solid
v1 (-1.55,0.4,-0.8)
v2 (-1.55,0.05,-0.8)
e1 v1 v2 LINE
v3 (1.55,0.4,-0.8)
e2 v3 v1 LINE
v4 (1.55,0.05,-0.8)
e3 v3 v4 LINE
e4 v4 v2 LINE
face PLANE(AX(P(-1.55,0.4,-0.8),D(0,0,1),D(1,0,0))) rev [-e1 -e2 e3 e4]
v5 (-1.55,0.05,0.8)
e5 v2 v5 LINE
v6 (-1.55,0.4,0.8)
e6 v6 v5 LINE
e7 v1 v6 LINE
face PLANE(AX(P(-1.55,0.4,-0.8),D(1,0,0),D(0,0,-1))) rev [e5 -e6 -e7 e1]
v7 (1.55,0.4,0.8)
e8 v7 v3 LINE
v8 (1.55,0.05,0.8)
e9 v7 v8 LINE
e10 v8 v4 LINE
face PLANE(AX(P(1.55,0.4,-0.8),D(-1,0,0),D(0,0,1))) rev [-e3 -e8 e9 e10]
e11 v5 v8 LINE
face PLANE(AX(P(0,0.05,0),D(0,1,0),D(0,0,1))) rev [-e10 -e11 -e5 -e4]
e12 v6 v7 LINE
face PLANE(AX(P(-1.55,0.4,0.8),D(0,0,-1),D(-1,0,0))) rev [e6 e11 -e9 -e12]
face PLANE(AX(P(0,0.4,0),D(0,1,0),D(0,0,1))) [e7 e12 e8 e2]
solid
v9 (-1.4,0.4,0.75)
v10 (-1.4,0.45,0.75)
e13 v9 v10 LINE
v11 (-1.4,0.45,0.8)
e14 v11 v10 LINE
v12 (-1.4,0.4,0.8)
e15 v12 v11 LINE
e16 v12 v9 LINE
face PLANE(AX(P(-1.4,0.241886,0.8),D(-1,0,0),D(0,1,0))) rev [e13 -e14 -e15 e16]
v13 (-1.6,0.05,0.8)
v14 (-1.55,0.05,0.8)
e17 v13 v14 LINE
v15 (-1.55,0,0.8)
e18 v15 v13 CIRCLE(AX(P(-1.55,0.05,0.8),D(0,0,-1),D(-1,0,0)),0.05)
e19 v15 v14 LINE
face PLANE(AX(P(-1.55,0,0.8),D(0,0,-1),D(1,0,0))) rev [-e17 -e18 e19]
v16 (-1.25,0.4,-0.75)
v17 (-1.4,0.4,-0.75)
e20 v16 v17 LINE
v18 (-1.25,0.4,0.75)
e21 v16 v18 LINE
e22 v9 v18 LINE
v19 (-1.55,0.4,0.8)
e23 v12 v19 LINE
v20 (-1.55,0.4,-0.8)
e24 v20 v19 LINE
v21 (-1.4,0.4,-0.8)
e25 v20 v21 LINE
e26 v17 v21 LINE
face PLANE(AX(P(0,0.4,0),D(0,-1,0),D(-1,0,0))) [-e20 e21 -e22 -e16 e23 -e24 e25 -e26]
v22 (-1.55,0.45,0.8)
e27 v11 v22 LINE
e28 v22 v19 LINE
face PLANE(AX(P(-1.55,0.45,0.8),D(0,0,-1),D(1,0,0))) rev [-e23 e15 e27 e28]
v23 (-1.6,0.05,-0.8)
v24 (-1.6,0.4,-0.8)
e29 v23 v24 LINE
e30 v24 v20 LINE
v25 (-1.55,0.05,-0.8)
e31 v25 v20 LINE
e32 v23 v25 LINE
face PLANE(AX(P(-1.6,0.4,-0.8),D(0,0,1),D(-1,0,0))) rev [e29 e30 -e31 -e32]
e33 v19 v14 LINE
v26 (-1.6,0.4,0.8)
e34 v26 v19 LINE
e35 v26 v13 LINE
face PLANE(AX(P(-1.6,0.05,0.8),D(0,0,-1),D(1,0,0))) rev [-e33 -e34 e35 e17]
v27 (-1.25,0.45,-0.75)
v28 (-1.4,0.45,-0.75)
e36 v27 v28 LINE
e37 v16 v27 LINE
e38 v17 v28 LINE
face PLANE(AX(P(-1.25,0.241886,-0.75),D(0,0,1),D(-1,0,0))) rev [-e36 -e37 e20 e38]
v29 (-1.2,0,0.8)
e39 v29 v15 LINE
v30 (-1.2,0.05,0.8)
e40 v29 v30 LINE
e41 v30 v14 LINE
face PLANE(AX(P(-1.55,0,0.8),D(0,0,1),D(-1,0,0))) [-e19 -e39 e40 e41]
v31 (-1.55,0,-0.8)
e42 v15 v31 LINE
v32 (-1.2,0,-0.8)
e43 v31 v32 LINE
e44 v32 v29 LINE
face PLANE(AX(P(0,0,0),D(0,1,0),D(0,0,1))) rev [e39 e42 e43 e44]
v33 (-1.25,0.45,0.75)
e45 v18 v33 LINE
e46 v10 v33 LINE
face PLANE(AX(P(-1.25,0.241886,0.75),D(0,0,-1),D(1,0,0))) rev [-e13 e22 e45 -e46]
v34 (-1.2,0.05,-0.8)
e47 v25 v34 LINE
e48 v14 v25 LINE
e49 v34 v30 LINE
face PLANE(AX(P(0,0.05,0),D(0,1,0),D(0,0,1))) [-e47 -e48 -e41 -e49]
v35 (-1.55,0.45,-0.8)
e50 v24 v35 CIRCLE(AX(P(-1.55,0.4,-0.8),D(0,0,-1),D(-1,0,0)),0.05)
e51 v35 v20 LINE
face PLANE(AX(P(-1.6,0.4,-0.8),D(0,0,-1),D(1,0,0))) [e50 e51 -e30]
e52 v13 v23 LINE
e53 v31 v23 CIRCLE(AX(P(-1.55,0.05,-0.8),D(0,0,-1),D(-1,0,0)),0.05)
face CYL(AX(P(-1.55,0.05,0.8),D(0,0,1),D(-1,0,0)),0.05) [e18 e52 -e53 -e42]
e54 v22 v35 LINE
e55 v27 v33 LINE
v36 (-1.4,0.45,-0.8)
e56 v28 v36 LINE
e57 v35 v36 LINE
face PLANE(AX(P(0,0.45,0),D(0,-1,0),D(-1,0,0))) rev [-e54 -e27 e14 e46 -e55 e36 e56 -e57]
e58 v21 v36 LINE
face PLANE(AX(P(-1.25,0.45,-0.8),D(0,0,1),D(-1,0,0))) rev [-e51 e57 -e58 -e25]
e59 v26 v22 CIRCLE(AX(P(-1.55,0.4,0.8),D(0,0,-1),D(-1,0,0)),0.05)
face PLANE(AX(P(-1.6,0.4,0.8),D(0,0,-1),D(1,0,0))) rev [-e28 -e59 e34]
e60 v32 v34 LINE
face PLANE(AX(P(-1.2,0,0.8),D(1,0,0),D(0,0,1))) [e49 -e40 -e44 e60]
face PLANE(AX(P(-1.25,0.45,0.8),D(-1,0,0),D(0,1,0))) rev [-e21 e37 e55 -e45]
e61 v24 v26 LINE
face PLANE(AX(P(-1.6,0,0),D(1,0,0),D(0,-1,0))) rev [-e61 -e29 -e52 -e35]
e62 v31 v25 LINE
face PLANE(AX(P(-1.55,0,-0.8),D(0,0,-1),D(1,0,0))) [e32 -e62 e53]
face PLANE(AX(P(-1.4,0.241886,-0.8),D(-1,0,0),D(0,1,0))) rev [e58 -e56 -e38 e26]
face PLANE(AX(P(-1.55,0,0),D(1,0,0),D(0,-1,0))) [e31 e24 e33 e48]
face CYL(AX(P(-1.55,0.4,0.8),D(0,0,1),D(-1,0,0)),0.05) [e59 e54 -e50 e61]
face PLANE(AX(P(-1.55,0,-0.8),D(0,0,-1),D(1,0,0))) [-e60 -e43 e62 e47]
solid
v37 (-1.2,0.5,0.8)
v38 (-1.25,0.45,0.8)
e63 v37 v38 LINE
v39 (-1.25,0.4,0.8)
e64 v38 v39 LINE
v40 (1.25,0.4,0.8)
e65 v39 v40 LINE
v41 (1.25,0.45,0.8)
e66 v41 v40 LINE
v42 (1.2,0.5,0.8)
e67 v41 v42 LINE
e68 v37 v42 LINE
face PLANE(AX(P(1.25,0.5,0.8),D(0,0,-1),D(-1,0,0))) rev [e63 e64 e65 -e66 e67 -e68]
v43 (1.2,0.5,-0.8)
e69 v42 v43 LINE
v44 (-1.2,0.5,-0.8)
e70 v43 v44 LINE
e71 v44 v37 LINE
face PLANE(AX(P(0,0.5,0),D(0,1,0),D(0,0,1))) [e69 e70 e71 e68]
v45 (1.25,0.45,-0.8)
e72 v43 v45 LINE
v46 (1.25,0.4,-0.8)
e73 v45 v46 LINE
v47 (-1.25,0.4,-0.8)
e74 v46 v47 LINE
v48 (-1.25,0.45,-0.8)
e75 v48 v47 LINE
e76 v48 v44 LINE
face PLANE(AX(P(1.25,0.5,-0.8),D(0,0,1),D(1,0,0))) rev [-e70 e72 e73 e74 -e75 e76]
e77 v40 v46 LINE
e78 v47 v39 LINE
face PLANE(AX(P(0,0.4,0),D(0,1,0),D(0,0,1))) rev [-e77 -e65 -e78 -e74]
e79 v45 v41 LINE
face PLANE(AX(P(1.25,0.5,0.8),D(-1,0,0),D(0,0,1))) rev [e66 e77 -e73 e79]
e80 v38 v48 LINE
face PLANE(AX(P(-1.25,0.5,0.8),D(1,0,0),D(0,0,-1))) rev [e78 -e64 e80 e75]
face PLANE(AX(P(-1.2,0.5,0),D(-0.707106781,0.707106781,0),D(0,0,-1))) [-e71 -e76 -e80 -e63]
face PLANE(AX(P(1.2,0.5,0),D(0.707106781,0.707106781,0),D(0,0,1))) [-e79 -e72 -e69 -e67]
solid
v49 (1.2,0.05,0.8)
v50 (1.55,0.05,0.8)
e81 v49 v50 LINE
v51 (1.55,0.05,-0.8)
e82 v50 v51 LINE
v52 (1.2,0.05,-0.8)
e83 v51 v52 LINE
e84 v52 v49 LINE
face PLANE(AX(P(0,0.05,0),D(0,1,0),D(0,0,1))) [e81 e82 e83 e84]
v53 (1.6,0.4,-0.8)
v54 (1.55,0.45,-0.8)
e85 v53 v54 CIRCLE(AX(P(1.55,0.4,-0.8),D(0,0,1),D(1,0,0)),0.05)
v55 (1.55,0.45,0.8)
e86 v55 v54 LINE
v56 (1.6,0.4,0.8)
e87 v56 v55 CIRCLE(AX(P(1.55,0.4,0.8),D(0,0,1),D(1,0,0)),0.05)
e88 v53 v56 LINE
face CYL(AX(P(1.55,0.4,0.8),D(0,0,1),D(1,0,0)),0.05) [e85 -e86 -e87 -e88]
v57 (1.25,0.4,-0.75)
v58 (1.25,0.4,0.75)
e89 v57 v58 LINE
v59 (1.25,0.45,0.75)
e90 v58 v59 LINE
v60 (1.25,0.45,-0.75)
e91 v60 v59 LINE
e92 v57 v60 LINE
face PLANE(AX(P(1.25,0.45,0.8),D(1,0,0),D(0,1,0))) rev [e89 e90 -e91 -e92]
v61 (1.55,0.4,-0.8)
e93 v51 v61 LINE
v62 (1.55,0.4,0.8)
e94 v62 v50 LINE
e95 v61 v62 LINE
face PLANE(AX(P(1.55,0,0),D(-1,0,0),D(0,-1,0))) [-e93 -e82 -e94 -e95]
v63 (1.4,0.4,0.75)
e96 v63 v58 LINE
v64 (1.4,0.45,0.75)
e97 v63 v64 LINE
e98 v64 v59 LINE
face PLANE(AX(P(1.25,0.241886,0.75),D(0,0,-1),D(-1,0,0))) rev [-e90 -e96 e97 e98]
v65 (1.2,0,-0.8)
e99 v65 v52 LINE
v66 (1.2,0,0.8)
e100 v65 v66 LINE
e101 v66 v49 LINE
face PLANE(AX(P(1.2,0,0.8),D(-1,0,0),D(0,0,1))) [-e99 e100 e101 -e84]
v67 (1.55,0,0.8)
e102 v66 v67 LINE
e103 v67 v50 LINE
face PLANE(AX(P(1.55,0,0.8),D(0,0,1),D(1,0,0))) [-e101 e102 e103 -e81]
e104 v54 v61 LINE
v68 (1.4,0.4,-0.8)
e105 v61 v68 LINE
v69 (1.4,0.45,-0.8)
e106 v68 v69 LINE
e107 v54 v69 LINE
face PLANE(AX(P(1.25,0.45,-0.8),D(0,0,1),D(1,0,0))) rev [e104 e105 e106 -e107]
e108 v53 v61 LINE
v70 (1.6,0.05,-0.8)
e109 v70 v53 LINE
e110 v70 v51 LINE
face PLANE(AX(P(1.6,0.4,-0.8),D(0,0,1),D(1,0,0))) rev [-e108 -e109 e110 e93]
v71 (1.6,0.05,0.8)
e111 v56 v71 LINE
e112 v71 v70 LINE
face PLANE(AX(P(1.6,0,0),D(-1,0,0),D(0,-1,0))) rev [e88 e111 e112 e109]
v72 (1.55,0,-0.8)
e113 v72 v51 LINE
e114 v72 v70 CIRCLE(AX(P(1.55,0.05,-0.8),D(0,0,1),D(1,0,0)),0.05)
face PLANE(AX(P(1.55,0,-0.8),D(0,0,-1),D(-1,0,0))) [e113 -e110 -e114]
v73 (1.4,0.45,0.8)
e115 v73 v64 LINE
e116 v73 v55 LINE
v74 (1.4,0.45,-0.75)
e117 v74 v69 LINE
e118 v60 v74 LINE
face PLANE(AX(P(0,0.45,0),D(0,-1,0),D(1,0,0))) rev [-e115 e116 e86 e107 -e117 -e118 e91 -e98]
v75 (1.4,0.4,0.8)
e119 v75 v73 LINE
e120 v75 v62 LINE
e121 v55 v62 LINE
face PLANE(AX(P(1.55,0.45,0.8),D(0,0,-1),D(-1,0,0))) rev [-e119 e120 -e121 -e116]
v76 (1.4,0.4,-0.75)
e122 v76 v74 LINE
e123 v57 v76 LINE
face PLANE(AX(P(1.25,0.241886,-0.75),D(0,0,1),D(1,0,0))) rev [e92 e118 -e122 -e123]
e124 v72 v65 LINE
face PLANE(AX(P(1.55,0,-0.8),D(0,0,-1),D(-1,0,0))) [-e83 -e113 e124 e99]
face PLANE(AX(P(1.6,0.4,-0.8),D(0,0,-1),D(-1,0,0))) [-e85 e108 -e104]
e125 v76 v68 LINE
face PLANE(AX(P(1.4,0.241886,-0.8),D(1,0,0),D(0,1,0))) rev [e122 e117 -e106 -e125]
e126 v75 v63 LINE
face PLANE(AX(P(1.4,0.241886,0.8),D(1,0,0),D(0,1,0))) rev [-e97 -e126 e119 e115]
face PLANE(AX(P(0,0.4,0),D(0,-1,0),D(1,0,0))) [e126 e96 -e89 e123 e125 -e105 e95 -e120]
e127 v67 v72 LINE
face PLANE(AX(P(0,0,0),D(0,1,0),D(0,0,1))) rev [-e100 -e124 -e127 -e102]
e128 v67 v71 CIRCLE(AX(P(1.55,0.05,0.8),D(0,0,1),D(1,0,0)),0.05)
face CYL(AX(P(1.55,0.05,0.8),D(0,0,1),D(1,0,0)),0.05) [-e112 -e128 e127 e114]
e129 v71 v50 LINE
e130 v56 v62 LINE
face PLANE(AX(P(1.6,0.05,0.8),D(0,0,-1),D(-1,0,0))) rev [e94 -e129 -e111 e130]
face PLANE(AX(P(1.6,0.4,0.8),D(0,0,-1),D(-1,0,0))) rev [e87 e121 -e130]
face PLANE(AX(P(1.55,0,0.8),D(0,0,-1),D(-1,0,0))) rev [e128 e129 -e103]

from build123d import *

# Parameters (mm, degrees)
SKETCH1_W              = 3.1
SKETCH1_H              = 1.6
BOSS_EXTRUDE1_DEPTH    = 0.35
SKETCH2_W              = 0.35
SKETCH2_H              = 1.6
BASE_FLANGE1_DEPTH     = 0.05
SM_START               = -0.8
SM_EDGE_FLANGE_1_DEPTH = 1.6
SM_EDGE_FLANGE_2_DEPTH = 1.6
SKETCH14_W             = 0.15
SKETCH14_H             = 0.05
CUT_EXTRUDE1_DEPTH     = 0.05
SKETCH17_W             = 2.5
SKETCH17_H             = 1.6
BOSS_EXTRUDE3_DEPTH    = 0.1
CHAMFER1_SIZE          = 0.05


# Read off the part's stored shape, not the designer's step: Ребро-кромка1, Ребро-кромка2
# Sheet-metal steps are written as plain solids
with BuildPart() as part:
    # Sketch1 → Boss-Extrude1 (new body)
    with BuildSketch(Plane(origin=(0, 0.05, 0), x_dir=(1, 0, 0), z_dir=(0, 1, 0))):
        Rectangle(SKETCH1_W, SKETCH1_H)
    extrude(amount=BOSS_EXTRUDE1_DEPTH)


with BuildPart() as body_2:
    # Sketch2 → Base-Flange1 (new body)
    with BuildSketch(Plane(origin=(0, 0.05, 0), x_dir=(1, 0, 0), z_dir=(0, 1, 0))):
        with Locations((1.375, 0)):
            Rectangle(SKETCH2_W, SKETCH2_H)
    extrude(amount=-BASE_FLANGE1_DEPTH)

    # Ребро-кромка1 outline → Ребро-кромка1 (add)
    with BuildSketch(Plane.XY.offset(SM_START)):
        with BuildLine():
            Line((1.55, 0.4), (1.55, 0))
            ThreePointArc((1.55, 0), (1.585355339, 0.014644661), (1.6, 0.05))
            Line((1.6, 0.05), (1.6, 0.4))
            Line((1.6, 0.4), (1.55, 0.4))
        make_face()
    extrude(amount=SM_EDGE_FLANGE_1_DEPTH)

    # Ребро-кромка2 outline → Ребро-кромка2 (add)
    with BuildSketch(Plane.XY.offset(SM_START)):
        with BuildLine():
            Line((1.25, 0.4), (1.6, 0.4))
            ThreePointArc((1.6, 0.4), (1.585355339, 0.435355339), (1.55, 0.45))
            Line((1.55, 0.45), (1.25, 0.45))
            Line((1.25, 0.45), (1.25, 0.4))
        make_face()
    extrude(amount=SM_EDGE_FLANGE_2_DEPTH)

    # Sketch14 → Cut-Extrude1 (cut)
    with BuildSketch(Plane(origin=(0, 0.45, 0), x_dir=(1, 0, 0), z_dir=(0, 1, 0))):
        with Locations((1.325, -0.775)):
            Rectangle(SKETCH14_W, SKETCH14_H)
        with Locations((1.325, 0.775)):
            Rectangle(SKETCH14_W, SKETCH14_H)
    extrude(amount=-CUT_EXTRUDE1_DEPTH, mode=Mode.SUBTRACT)


with BuildPart() as body_3:
    # Mirror1: mirrored copy
    add(body_2.part.mirror(Plane(origin=(0, 0, 0), x_dir=(0, 0, 1), z_dir=(1, 0, 0))))


with BuildPart() as body_4:
    # Sketch17 → Boss-Extrude3 (new body)
    with BuildSketch(Plane(origin=(0, 0.4, 0), x_dir=(1, 0, 0), z_dir=(0, 1, 0))):
        Rectangle(SKETCH17_W, SKETCH17_H)
    extrude(amount=BOSS_EXTRUDE3_DEPTH)

    # Chamfer1
    chamfer1_edges = [body_4.edges().sort_by_distance(p)[0] for p in [
        (-1.25, 0.5, 0),
        (1.25, 0.5, 0),
    ]]
    chamfer(chamfer1_edges, length=CHAMFER1_SIZE)


solid = Compound([part.part, body_2.part, body_3.part, body_4.part])
